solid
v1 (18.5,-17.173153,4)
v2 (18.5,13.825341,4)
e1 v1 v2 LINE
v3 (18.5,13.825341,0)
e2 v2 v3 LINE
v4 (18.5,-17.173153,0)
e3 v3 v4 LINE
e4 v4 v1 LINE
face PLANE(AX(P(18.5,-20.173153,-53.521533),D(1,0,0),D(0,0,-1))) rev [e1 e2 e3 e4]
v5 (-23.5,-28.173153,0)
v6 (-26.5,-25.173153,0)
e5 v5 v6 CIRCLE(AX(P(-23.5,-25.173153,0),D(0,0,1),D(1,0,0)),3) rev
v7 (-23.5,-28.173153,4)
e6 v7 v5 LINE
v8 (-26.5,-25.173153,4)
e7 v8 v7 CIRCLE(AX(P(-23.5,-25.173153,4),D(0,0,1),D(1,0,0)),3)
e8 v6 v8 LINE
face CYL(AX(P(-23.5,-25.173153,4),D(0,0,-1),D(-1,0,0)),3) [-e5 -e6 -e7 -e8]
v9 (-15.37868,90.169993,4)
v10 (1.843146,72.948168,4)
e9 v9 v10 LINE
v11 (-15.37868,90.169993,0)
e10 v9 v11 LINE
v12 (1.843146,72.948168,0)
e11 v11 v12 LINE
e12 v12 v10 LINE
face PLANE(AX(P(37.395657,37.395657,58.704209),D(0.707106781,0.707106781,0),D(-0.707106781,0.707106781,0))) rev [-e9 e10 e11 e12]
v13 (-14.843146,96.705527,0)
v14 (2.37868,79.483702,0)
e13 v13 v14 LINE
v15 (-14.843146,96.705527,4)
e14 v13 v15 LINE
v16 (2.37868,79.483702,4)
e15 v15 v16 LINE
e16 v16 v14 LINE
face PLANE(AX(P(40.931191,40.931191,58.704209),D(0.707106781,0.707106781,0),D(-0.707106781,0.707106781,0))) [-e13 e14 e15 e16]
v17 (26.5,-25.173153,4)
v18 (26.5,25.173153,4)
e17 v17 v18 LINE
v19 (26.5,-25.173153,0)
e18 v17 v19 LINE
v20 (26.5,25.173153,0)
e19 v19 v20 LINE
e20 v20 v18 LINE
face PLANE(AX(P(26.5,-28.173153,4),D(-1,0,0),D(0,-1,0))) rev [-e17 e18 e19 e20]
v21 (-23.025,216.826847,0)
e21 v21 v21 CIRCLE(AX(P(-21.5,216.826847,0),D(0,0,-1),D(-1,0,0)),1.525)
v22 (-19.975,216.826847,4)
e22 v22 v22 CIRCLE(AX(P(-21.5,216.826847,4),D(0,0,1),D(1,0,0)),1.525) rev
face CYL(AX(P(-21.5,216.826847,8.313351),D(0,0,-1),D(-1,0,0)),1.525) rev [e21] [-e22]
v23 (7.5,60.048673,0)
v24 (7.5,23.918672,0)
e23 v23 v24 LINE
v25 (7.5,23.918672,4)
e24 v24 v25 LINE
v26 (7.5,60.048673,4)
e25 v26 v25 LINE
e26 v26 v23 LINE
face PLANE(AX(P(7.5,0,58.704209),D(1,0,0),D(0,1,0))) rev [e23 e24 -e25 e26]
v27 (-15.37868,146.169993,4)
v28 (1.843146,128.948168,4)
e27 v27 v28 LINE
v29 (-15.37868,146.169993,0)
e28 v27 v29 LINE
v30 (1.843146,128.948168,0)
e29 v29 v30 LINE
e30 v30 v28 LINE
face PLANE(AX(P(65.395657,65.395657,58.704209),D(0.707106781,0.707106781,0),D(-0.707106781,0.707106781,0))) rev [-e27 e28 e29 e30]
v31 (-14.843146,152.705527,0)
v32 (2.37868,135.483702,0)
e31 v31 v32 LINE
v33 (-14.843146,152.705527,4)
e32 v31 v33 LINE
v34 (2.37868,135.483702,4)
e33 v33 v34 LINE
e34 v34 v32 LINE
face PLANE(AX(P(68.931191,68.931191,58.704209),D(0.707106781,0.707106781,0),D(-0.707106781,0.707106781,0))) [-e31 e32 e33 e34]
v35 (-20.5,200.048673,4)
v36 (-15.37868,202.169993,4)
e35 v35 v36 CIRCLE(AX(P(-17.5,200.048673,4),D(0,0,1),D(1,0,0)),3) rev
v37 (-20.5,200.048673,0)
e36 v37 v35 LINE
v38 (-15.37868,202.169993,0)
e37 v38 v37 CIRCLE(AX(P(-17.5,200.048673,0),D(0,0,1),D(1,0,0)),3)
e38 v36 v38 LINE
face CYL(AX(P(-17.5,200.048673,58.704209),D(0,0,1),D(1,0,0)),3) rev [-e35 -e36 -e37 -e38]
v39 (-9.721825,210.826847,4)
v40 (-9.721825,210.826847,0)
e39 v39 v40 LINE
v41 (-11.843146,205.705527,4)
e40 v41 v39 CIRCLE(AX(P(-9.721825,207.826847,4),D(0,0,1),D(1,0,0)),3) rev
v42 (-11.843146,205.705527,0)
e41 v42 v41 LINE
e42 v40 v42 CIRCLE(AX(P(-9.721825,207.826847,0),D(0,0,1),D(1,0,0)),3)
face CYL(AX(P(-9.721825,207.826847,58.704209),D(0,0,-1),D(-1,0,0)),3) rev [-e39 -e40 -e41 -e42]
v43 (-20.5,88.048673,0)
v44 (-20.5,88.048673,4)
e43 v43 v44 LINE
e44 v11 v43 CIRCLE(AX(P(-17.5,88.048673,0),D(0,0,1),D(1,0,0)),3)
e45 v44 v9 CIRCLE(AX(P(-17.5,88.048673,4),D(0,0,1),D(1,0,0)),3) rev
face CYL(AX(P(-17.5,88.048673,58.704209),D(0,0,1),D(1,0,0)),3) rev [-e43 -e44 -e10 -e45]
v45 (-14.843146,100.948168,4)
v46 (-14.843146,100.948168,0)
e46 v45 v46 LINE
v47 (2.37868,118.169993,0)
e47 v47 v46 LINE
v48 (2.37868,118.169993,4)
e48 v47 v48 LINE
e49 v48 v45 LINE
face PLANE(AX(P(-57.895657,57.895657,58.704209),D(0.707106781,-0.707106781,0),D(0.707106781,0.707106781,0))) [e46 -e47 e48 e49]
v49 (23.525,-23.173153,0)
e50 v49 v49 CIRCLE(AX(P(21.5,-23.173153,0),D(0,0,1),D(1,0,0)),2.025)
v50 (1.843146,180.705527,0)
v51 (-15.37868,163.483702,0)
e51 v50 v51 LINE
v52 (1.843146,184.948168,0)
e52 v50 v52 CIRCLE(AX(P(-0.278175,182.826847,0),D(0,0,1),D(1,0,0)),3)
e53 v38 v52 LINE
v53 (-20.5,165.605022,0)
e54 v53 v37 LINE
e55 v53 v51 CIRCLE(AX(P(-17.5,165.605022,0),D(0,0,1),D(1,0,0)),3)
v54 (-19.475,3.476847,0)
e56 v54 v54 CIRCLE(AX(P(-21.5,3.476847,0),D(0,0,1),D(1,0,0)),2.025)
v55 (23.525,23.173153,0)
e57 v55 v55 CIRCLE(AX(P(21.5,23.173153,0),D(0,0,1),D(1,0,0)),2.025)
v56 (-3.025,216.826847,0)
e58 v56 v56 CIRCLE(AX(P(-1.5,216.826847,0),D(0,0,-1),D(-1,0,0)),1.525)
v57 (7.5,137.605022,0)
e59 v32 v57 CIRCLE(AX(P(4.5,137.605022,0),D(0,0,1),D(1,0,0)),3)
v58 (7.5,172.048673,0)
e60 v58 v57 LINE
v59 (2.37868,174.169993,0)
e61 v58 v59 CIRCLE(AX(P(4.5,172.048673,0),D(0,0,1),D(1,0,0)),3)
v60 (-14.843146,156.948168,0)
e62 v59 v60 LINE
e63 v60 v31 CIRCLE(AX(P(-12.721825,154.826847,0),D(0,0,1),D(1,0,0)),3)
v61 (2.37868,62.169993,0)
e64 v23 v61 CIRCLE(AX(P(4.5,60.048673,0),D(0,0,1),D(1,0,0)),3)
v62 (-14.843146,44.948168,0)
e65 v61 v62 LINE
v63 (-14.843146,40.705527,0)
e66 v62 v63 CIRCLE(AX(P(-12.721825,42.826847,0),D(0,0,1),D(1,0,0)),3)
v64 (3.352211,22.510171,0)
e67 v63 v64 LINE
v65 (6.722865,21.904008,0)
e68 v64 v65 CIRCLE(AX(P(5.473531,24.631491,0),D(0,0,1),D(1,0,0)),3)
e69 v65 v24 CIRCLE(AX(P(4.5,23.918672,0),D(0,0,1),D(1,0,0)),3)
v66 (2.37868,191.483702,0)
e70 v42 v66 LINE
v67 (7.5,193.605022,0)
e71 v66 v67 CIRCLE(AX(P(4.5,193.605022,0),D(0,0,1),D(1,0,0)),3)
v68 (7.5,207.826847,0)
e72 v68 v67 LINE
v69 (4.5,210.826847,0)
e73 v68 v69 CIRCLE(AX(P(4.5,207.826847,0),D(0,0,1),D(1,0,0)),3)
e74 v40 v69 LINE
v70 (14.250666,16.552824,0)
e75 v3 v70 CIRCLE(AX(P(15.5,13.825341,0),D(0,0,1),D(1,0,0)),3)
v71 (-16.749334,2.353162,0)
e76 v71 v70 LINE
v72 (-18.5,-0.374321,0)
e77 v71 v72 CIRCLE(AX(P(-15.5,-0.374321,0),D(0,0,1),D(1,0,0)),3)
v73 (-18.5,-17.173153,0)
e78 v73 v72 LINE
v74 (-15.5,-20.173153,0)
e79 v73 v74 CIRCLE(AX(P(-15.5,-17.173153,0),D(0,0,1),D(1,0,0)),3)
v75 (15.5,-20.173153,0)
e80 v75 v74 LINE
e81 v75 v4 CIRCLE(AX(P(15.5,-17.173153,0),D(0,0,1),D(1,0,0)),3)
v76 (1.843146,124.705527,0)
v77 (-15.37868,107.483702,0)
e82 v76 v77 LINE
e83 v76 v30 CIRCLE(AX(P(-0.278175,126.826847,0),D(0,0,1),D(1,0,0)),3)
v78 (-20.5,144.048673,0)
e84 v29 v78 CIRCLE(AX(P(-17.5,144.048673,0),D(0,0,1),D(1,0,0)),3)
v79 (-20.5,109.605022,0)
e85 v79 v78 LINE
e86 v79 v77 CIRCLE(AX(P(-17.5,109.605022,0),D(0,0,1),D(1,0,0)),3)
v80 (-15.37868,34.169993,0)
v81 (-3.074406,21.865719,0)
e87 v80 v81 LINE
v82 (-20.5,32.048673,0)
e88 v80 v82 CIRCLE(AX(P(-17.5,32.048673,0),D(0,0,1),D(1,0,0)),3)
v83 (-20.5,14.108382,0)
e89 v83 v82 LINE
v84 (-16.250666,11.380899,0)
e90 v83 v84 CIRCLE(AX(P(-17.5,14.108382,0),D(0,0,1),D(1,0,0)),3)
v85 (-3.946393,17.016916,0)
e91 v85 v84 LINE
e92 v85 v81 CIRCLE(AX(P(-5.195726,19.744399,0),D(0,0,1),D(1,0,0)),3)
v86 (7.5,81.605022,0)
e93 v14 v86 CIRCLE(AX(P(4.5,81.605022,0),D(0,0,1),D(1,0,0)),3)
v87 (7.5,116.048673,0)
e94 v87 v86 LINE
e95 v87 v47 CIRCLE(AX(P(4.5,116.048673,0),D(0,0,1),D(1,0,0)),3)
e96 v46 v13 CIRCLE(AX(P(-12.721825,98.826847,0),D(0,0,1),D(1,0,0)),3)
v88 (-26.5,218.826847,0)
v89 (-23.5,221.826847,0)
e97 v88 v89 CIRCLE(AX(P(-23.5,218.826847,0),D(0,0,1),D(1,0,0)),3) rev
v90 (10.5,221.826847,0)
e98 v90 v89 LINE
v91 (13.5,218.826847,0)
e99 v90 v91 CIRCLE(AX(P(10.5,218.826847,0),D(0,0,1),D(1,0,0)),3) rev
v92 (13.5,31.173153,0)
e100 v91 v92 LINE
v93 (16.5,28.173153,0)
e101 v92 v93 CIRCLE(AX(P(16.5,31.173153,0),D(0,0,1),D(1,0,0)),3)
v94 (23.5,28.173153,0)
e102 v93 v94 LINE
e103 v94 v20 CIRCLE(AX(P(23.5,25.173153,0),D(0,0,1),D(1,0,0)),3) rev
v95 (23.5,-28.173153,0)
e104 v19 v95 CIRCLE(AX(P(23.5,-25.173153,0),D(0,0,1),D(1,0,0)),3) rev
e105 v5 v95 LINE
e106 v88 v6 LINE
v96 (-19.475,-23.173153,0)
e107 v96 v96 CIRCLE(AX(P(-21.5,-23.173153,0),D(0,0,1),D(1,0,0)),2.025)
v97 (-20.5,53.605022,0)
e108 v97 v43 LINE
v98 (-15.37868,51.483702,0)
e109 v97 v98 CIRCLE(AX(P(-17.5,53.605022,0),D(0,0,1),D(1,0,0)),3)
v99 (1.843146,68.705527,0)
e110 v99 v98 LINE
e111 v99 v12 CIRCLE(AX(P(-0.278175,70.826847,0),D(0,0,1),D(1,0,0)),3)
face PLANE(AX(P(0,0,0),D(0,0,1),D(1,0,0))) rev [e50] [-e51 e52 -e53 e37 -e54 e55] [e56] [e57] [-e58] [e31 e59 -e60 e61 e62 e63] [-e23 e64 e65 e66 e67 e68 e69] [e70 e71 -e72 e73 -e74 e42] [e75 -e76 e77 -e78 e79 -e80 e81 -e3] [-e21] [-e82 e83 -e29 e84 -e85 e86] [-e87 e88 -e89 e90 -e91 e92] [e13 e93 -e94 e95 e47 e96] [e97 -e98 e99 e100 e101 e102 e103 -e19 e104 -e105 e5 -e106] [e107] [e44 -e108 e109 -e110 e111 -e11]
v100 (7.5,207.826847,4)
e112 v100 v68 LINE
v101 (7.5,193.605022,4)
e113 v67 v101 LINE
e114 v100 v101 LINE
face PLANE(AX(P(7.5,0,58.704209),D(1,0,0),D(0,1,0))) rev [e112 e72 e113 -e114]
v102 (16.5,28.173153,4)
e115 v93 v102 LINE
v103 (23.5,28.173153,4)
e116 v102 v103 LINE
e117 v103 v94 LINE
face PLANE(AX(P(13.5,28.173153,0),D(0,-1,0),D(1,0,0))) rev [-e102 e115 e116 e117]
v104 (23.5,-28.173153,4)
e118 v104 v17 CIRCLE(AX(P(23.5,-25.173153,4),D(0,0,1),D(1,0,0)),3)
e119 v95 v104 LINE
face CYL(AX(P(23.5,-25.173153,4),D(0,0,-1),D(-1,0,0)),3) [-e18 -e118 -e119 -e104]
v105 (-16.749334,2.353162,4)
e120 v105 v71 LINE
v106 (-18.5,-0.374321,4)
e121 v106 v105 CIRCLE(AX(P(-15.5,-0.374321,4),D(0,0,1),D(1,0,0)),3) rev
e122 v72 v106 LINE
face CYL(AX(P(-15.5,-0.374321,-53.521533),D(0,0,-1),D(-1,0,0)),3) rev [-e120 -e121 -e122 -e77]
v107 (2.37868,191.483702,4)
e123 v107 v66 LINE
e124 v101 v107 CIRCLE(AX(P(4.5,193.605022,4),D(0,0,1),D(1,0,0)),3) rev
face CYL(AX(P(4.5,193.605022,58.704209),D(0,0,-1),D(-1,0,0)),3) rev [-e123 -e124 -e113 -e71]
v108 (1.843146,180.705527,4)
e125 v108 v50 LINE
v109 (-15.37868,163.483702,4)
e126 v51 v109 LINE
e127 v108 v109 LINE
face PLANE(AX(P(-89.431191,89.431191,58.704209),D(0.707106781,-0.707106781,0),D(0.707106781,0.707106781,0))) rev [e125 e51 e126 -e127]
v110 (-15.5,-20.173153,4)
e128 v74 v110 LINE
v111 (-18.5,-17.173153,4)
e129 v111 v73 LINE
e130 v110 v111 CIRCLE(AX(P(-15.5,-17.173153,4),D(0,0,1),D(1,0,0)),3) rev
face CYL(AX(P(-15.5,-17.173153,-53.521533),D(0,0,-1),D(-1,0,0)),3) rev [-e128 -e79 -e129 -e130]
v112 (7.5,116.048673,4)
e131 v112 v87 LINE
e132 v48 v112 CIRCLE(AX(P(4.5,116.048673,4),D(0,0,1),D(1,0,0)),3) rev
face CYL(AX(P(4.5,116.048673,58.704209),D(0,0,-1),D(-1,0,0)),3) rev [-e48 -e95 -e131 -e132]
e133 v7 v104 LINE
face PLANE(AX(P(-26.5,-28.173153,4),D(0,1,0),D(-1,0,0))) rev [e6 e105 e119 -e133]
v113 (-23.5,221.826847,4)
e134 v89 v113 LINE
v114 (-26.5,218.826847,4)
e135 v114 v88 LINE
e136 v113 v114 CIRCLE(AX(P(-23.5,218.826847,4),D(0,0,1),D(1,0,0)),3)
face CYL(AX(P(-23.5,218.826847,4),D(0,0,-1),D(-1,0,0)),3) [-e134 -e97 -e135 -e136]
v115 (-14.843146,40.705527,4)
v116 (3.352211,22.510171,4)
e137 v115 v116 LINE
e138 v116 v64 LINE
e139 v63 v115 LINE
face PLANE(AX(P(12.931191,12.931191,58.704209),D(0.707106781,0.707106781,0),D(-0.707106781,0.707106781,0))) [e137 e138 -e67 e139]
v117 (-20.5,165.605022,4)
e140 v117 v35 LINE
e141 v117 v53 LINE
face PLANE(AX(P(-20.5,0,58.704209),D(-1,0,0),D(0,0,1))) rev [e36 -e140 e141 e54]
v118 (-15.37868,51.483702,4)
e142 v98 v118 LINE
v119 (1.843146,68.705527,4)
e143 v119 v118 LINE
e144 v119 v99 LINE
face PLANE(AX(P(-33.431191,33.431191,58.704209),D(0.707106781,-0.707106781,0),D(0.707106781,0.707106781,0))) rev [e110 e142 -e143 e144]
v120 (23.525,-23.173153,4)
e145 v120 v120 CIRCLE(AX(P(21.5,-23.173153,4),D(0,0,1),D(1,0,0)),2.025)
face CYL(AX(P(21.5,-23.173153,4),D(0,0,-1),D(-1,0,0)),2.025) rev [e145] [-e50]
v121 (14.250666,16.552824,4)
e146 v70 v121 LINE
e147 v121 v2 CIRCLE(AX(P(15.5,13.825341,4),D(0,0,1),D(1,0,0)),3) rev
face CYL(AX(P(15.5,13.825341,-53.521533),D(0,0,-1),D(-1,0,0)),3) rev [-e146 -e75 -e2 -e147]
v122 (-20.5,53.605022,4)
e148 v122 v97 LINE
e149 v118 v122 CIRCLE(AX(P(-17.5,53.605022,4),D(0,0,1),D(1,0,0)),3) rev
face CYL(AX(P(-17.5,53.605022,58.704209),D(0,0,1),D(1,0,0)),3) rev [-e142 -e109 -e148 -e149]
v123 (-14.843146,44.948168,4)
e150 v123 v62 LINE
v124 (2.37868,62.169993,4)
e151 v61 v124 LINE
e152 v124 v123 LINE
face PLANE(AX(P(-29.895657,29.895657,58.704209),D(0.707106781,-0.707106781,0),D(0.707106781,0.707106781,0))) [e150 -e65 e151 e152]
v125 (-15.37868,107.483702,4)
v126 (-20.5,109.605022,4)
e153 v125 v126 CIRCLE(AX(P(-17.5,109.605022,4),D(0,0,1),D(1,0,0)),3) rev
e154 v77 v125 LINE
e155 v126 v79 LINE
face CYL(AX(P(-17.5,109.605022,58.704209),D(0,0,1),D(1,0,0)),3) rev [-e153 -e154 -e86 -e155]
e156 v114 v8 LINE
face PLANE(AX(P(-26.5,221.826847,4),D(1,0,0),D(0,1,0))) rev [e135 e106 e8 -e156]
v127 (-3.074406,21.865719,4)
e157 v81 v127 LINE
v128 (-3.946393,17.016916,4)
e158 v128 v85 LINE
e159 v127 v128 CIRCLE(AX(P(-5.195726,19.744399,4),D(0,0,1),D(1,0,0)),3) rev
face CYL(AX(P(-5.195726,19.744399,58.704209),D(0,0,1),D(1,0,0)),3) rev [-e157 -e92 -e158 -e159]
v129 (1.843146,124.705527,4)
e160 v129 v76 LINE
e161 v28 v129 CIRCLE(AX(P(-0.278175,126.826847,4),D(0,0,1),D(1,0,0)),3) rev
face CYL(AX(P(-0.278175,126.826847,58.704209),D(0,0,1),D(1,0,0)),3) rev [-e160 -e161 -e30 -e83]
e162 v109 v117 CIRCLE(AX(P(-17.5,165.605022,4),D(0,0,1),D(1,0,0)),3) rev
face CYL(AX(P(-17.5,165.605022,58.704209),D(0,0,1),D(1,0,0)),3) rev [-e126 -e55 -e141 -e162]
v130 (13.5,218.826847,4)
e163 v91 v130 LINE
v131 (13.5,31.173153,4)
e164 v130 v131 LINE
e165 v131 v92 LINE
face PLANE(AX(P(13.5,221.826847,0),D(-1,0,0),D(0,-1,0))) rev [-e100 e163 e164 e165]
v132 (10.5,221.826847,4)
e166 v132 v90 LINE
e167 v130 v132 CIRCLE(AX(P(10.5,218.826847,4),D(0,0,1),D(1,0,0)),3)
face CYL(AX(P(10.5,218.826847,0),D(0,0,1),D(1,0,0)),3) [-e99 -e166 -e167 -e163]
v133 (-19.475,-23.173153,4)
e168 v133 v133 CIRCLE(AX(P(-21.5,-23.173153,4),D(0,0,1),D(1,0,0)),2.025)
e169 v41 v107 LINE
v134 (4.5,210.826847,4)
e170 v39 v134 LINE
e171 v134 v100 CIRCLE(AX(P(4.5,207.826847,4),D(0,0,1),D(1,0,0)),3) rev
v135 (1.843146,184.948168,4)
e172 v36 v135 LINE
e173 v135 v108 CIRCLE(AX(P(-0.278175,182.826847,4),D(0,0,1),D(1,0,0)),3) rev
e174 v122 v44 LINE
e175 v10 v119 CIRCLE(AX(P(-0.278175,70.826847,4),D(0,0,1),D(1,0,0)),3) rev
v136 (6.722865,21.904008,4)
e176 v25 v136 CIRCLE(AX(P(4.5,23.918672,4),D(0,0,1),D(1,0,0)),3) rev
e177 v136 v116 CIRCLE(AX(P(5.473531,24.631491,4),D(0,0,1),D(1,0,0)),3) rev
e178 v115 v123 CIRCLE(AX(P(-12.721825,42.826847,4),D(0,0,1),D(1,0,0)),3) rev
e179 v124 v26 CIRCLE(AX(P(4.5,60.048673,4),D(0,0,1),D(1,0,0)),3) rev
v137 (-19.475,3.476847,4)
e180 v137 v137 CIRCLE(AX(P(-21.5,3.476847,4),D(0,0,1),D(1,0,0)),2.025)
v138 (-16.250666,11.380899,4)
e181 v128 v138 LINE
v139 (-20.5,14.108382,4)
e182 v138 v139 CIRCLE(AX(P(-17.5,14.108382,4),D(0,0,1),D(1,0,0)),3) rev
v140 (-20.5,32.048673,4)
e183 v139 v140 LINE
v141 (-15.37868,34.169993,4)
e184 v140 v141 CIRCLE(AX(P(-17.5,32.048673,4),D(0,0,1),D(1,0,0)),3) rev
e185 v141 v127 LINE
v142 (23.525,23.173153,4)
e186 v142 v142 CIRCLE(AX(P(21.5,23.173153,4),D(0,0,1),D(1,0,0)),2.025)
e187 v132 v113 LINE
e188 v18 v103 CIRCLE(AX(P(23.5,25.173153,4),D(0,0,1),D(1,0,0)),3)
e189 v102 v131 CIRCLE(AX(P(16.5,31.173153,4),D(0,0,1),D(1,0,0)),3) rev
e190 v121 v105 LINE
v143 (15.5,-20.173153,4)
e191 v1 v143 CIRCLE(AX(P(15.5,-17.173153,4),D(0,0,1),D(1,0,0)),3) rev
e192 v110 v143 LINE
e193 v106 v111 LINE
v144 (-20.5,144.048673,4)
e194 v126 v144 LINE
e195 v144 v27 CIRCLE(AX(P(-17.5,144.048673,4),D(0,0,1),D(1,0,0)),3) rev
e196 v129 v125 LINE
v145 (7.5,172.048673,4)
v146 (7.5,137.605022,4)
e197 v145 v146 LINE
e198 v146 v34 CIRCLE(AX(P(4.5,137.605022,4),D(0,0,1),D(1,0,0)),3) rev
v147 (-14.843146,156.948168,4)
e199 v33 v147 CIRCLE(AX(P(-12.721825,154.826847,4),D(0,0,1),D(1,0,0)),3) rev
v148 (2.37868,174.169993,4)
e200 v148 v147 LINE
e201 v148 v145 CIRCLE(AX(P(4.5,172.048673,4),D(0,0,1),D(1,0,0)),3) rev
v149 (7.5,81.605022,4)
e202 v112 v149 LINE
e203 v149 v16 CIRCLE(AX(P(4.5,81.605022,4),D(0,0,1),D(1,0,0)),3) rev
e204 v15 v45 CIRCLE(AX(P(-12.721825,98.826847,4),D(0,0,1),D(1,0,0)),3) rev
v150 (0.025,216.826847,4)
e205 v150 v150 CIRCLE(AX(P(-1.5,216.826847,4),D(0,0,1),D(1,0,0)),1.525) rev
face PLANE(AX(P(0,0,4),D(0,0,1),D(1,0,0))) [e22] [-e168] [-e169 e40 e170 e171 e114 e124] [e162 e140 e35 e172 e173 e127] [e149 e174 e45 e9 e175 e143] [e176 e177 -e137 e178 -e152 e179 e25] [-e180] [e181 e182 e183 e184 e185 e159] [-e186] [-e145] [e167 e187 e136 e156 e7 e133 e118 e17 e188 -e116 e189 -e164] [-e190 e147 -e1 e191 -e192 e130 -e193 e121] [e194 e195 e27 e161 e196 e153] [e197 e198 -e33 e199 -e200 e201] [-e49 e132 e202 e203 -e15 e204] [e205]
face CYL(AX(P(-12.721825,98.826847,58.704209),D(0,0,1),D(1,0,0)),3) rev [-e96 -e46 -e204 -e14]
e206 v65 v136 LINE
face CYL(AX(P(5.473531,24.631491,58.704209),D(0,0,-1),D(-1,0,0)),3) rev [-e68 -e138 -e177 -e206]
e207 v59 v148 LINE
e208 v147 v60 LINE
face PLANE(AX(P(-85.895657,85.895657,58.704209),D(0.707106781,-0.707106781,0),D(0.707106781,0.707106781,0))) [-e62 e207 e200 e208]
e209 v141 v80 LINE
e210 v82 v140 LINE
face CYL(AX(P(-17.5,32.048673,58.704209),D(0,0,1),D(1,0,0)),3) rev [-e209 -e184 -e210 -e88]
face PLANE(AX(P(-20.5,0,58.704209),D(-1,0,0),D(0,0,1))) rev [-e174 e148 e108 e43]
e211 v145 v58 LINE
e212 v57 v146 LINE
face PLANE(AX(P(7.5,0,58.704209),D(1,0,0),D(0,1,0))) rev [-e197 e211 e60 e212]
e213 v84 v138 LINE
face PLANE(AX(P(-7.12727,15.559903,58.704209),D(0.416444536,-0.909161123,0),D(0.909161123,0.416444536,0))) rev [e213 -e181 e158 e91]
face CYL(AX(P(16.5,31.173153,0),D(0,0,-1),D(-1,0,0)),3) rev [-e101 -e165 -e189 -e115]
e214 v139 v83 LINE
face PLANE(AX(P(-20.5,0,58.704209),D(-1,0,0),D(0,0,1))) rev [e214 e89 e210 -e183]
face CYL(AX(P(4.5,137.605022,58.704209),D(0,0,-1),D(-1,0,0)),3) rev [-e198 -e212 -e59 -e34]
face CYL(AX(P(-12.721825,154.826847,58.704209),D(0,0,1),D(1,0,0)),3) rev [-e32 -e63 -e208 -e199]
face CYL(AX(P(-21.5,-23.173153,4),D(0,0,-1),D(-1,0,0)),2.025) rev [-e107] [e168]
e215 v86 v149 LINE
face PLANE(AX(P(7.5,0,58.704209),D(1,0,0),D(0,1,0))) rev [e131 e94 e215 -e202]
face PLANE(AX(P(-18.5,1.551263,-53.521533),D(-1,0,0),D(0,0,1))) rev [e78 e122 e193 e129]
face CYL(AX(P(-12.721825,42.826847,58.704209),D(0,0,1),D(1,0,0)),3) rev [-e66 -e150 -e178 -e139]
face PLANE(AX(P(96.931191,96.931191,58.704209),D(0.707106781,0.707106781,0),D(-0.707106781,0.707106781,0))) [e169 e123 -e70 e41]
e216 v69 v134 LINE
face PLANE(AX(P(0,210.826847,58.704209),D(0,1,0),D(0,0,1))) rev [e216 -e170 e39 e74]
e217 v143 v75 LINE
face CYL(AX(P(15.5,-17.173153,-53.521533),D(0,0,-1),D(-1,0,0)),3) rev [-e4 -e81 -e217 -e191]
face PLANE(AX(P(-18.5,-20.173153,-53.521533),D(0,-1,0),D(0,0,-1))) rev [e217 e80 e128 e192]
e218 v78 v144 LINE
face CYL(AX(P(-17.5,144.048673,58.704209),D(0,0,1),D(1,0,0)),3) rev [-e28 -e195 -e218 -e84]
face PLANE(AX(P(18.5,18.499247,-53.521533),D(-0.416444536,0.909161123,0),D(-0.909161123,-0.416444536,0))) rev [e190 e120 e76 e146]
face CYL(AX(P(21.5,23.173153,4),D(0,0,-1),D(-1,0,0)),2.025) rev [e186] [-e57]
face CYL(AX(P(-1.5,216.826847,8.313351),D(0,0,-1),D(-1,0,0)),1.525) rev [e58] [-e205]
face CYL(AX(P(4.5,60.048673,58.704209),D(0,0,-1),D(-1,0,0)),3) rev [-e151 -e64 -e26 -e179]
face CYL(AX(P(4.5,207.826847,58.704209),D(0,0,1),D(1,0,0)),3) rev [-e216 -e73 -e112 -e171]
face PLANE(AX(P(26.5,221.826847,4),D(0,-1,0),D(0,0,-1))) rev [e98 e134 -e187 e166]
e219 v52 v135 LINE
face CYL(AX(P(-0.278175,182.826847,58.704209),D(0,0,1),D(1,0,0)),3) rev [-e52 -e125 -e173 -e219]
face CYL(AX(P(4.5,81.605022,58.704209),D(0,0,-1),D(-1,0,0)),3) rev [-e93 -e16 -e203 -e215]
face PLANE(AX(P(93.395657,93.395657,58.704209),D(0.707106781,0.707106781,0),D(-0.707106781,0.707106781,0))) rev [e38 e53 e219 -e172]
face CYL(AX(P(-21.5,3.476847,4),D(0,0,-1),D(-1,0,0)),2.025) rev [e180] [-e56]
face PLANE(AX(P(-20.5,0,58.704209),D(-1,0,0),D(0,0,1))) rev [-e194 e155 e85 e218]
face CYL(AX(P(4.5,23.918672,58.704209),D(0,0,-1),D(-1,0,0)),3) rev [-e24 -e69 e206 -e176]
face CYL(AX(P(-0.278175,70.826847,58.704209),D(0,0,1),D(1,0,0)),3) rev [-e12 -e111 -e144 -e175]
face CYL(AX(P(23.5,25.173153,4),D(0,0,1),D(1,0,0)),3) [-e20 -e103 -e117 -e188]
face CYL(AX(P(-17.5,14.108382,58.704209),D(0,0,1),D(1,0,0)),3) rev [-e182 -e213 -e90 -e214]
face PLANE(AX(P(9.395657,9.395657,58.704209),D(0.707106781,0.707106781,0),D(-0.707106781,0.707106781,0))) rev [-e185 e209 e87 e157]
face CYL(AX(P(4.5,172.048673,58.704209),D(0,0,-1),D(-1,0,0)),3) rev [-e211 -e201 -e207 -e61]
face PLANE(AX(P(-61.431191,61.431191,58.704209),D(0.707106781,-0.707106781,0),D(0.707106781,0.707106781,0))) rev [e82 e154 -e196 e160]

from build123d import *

# Parameters (mm, degrees)
SKETCH_1_W          = 53
SKETCH_1_H          = 250
SKETCH_1_R          = 2.025
EXTRUDE_1_DEPTH     = 4
SKETCH_2_W          = 13
SKETCH_2_H          = 193.6536947
CUT_EXTRUDE_1_DEPTH = 4
SKETCH_6_R          = 1.525
CUT_EXTRUDE_3_DEPTH = 4
FILLET_1_R          = 3
CUT_EXTRUDE_4_DEPTH = 4
FILLET_2_R          = 3
CUT_EXTRUDE_5_DEPTH = 4
FILLET_3_R          = 3
FILLET_4_R          = 3


with BuildPart() as part:
    # 草图1 → 凸台-拉伸1 (new body)
    with BuildSketch(Plane.XY):
        with Locations((0, 96.82684735)):
            Rectangle(SKETCH_1_W, SKETCH_1_H)
        with Locations((21.5, 23.17315265)):
            Circle(SKETCH_1_R, mode=Mode.SUBTRACT)
        with Locations((21.5, -23.17315265)):
            Circle(SKETCH_1_R, mode=Mode.SUBTRACT)
        with Locations((-21.5, -23.17315265)):
            Circle(SKETCH_1_R, mode=Mode.SUBTRACT)
        with Locations((-21.5, 3.47684735)):
            Circle(SKETCH_1_R, mode=Mode.SUBTRACT)
    extrude(amount=EXTRUDE_1_DEPTH)

    # 草图2 → 切除-拉伸1 (cut)
    with BuildSketch(Plane.XY.offset(4)):
        with Locations((20, 125)):
            Rectangle(SKETCH_2_W, SKETCH_2_H)
    extrude(amount=-CUT_EXTRUDE_1_DEPTH, mode=Mode.SUBTRACT)

    # 草图6 → 切除-拉伸3 (cut)
    with BuildSketch(Plane(origin=(0, 0, 0), x_dir=(-1, 0, 0), z_dir=(0, 0, -1))):
        with Locations((21.5, 216.82684735)):
            Circle(SKETCH_6_R)
        with Locations((1.5, 216.82684735)):
            Circle(SKETCH_6_R)
    extrude(amount=-CUT_EXTRUDE_3_DEPTH, mode=Mode.SUBTRACT)

    # 圆角1
    fillet_1_edges = [part.edges().sort_by_distance(p)[0] for p in [
        (13.5, 221.82684735, 2),
        (26.5, 28.17315265, 2),
        (13.5, 28.17315265, 2),
        (-26.5, 221.82684735, 2),
        (26.5, -28.17315265, 2),
        (-26.5, -28.17315265, 2),
    ]]
    fillet(fillet_1_edges, radius=FILLET_1_R)

    # 草图7 → 切除-拉伸4 (cut)
    with BuildSketch(Plane.XY.offset(4)):
        Polygon((18.5, 18.499246673), (-18.5, 1.551263043), (-18.5, -20.17315265), (18.5, -20.17315265), align=None)
    extrude(amount=-CUT_EXTRUDE_4_DEPTH, mode=Mode.SUBTRACT)

    # 圆角2
    fillet_2_edges = [part.edges().sort_by_distance(p)[0] for p in [
        (18.5, 18.499246673, 2),
        (18.5, -20.17315265, 2),
        (-18.5, -20.17315265, 2),
        (-18.5, 1.551263043, 2),
    ]]
    fillet(fillet_2_edges, radius=FILLET_2_R)

    # 草图8 → 切除-拉伸5 (cut)
    with BuildSketch(Plane(origin=(0, 0, 0), x_dir=(-1, 0, 0), z_dir=(0, 0, -1))):
        Polygon((20.5, 39.291313444), (0.022812462, 18.814125906), (20.5, 9.434476198), align=None)
        Polygon((16.964466094, 42.82684735), (-7.5, 67.291313444), (-7.5, 22.259977323), (-4.826849962, 21.035531294), align=None)
        Polygon((20.5, 46.362381256), (20.5, 95.291313444), (-3.964466094, 70.82684735), align=None)
        Polygon((16.964466094, 98.82684735), (-7.5, 123.291313444), (-7.5, 74.362381256), align=None)
        Polygon((20.5, 102.362381256), (20.5, 151.291313444), (-3.964466094, 126.82684735), align=None)
        Polygon((16.964466094, 154.82684735), (-7.5, 179.291313444), (-7.5, 130.362381256), align=None)
        Polygon((20.5, 158.362381256), (20.5, 207.291313444), (-3.964466094, 182.82684735), align=None)
        Polygon((16.964466094, 210.82684735), (-7.5, 210.82684735), (-7.5, 186.362381256), align=None)
    extrude(amount=-CUT_EXTRUDE_5_DEPTH, mode=Mode.SUBTRACT)

    # 圆角3
    fillet_3_edges = [part.edges().sort_by_distance(p)[0] for p in [
        (4.826849962, 21.035531294, 2),
    ]]
    fillet(fillet_3_edges, radius=FILLET_3_R)

    # 圆角4
    # the kernel refuses this fillet: 3 mm, written as the material it adds along each edge
    with BuildSketch(Plane(origin=(-16.964466094, 98.82684735, 0), x_dir=(0.707106781186547, 0.7071067811865482, 0), z_dir=(0, 0, 1)), Plane(origin=(3.964466094, 126.82684735, 0), x_dir=(-0.7071067811865479, -0.707106781186547, 0), z_dir=(0, 0, 1)), Plane(origin=(7.5, 210.82684735, 0), x_dir=(0, -1, 0), z_dir=(0, 0, 1)), Plane(origin=(-16.964466094, 154.82684735, 0), x_dir=(0.7071067811865442, 0.7071067811865508, 0), z_dir=(0, 0, 1)), Plane(origin=(3.964466094, 182.82684735, 0), x_dir=(-0.7071067811865441, -0.7071067811865508, 0), z_dir=(0, 0, 1))) as fillet_4_piece_1:
        with BuildLine():
            CenterArc((FILLET_4_R, -FILLET_4_R), FILLET_4_R, 90, 90)
            Line((0, -FILLET_4_R), (-FILLET_4_R * 0.02, -FILLET_4_R))
            Line((-FILLET_4_R * 0.02, -FILLET_4_R), (-FILLET_4_R * 0.02, FILLET_4_R * 0.02))
            Line((-FILLET_4_R * 0.02, FILLET_4_R * 0.02), (FILLET_4_R, FILLET_4_R * 0.02))
            Line((FILLET_4_R, FILLET_4_R * 0.02), (FILLET_4_R, 0))
        make_face()
    extrude(amount=4)
    with BuildSketch(Plane(origin=(7.5, 74.362381256, 0), x_dir=(0, 1, 0), z_dir=(0, 0, 1)), Plane(origin=(-20.5, 102.362381256, 0), x_dir=(0.7071067811865476, 0.7071067811865476, 0), z_dir=(0, 0, 1)), Plane(origin=(7.5, 67.291313444, 0), x_dir=(-0.7071067811865478, -0.7071067811865471, 0), z_dir=(0, 0, 1)), Plane(origin=(-16.964466094, 210.82684735, 0), x_dir=(0.7071067811865466, -0.7071067811865486, 0), z_dir=(0, 0, 1)), Plane(origin=(7.5, 130.362381256, 0), x_dir=(0, 1, 0), z_dir=(0, 0, 1)), Plane(origin=(-20.5, 158.362381256, 0), x_dir=(0.707106781186543, 0.707106781186552, 0), z_dir=(0, 0, 1)), Plane(origin=(-20.5, 39.291313444, 0), x_dir=(0, -1, 0), z_dir=(0, 0, 1))) as fillet_4_piece_2:
        with BuildLine():
            CenterArc((FILLET_4_R * 2.41421356237, FILLET_4_R), FILLET_4_R, 135, 135)
            Line((FILLET_4_R * 1.70710678119, FILLET_4_R * 1.70710678119), (FILLET_4_R * 1.69296464556, FILLET_4_R * 1.72124891681))
            Line((FILLET_4_R * 1.69296464556, FILLET_4_R * 1.72124891681), (-FILLET_4_R * 0.0141421356237, FILLET_4_R * 0.0141421356237))
            Line((-FILLET_4_R * 0.0141421356237, FILLET_4_R * 0.0141421356237), (0, -FILLET_4_R * 0.02))
            Line((0, -FILLET_4_R * 0.02), (FILLET_4_R * 2.41421356237, -FILLET_4_R * 0.02))
            Line((FILLET_4_R * 2.41421356237, -FILLET_4_R * 0.02), (FILLET_4_R * 2.41421356237, 0))
        make_face()
    extrude(amount=4)
    with BuildSketch(Plane(origin=(7.5, 123.291313444, 0), x_dir=(0, -1, 0), z_dir=(0, 0, 1)), Plane(origin=(-20.5, 151.291313444, 0), x_dir=(0.707106781186547, -0.707106781186548, 0), z_dir=(0, 0, 1)), Plane(origin=(-20.5, 46.362381256, 0), x_dir=(0, 1, 0), z_dir=(0, 0, 1)), Plane(origin=(-20.5, 95.291313444, 0), x_dir=(0.7071067811865476, -0.7071067811865476, 0), z_dir=(0, 0, 1)), Plane(origin=(7.5, 186.362381256, 0), x_dir=(-0.7071067811865478, 0.7071067811865474, 0), z_dir=(0, 0, 1)), Plane(origin=(7.5, 179.291313444, 0), x_dir=(0, -1, 0), z_dir=(0, 0, 1)), Plane(origin=(-20.5, 207.291313444, 0), x_dir=(0.7071067811865468, -0.7071067811865482, 0), z_dir=(0, 0, 1))) as fillet_4_piece_3:
        with BuildLine():
            CenterArc((FILLET_4_R * 2.41421356237, -FILLET_4_R), FILLET_4_R, 90, 135)
            Line((FILLET_4_R * 1.70710678119, -FILLET_4_R * 1.70710678119), (FILLET_4_R * 1.69296464556, -FILLET_4_R * 1.72124891681))
            Line((FILLET_4_R * 1.69296464556, -FILLET_4_R * 1.72124891681), (-FILLET_4_R * 0.0141421356237, -FILLET_4_R * 0.0141421356237))
            Line((-FILLET_4_R * 0.0141421356237, -FILLET_4_R * 0.0141421356237), (0, FILLET_4_R * 0.02))
            Line((0, FILLET_4_R * 0.02), (FILLET_4_R * 2.41421356237, FILLET_4_R * 0.02))
            Line((FILLET_4_R * 2.41421356237, FILLET_4_R * 0.02), (FILLET_4_R * 2.41421356237, 0))
        make_face()
    extrude(amount=4)
    with BuildSketch(Plane(origin=(-16.964466094, 42.82684735, 0), x_dir=(0.7071067811865487, -0.7071067811865464, 0), z_dir=(0, 0, 1)), Plane(origin=(3.964466094, 70.82684735, 0), x_dir=(-0.707106781186549, 0.707106781186546, 0), z_dir=(0, 0, 1))) as fillet_4_piece_4:
        with BuildLine():
            CenterArc((FILLET_4_R, FILLET_4_R), FILLET_4_R, 180, 90)
            Line((0, FILLET_4_R), (-FILLET_4_R * 0.02, FILLET_4_R))
            Line((-FILLET_4_R * 0.02, FILLET_4_R), (-FILLET_4_R * 0.02, -FILLET_4_R * 0.02))
            Line((-FILLET_4_R * 0.02, -FILLET_4_R * 0.02), (FILLET_4_R, -FILLET_4_R * 0.02))
            Line((FILLET_4_R, -FILLET_4_R * 0.02), (FILLET_4_R, 0))
        make_face()
    extrude(amount=4)
    with BuildSketch(Plane(origin=(7.5, 22.259977323, 0), x_dir=(-0.9091611234166711, -0.4164445361242436, 0), z_dir=(0, 0, 1))) as fillet_4_piece_5:
        with BuildLine():
            CenterArc((2.03672897, -2.757354466), FILLET_4_R, 113.202499131, 42.187182076)
            Line((-0.6907544, -1.508020858), (-0.745304068, -1.483034186))
            Line((-0.745304068, -1.483034186), (-0.054549667, 0.024986672))
            Line((-0.054549667, 0.024986672), (0, 0.06))
            ThreePointArc((0, 0.06), (0.427391485, 0.06), (0.83114405, 0.055147089))
            Line((0.83114405, 0.055147089), (0.85478297, 0))
        make_face()
    extrude(amount=4)
    with BuildSketch(Plane(origin=(-0.022812462, 18.814125906, 0), x_dir=(-0.9091611234134724, -0.4164445361312268, 0), z_dir=(0, 0, 1))) as fillet_4_piece_6:
        with BuildLine():
            CenterArc((FILLET_4_R * 1.43853500921, -FILLET_4_R), FILLET_4_R, 90, 110.389681207)
            Line((FILLET_4_R * 0.501190258162, -FILLET_4_R * 1.34840324007), (FILLET_4_R * 0.482443363141, -FILLET_4_R * 1.35537130487))
            Line((FILLET_4_R * 0.482443363141, -FILLET_4_R * 1.35537130487), (-FILLET_4_R * 0.0287707001841, FILLET_4_R * 0.02))
            Line((-FILLET_4_R * 0.0287707001841, FILLET_4_R * 0.02), (FILLET_4_R * 1.43853500921, FILLET_4_R * 0.02))
            Line((FILLET_4_R * 1.43853500921, FILLET_4_R * 0.02), (FILLET_4_R * 1.43853500921, 0))
        make_face()
    extrude(amount=4)
    with BuildSketch(Plane(origin=(-20.5, 9.434476198, 0), x_dir=(0, 1, 0), z_dir=(0, 0, 1))) as fillet_4_piece_7:
        with BuildLine():
            CenterArc((FILLET_4_R * 1.55796865886, -FILLET_4_R), FILLET_4_R, 90, 114.610318793)
            Line((FILLET_4_R * 0.648807535446, -FILLET_4_R * 1.41644453613), (FILLET_4_R * 0.630624312977, -FILLET_4_R * 1.42477342685))
            Line((FILLET_4_R * 0.630624312977, -FILLET_4_R * 1.42477342685), (-FILLET_4_R * 0.0311593731772, FILLET_4_R * 0.02))
            Line((-FILLET_4_R * 0.0311593731772, FILLET_4_R * 0.02), (FILLET_4_R * 1.55796865886, FILLET_4_R * 0.02))
            Line((FILLET_4_R * 1.55796865886, FILLET_4_R * 0.02), (FILLET_4_R * 1.55796865886, 0))
        make_face()
    extrude(amount=4)


solid = part.part
